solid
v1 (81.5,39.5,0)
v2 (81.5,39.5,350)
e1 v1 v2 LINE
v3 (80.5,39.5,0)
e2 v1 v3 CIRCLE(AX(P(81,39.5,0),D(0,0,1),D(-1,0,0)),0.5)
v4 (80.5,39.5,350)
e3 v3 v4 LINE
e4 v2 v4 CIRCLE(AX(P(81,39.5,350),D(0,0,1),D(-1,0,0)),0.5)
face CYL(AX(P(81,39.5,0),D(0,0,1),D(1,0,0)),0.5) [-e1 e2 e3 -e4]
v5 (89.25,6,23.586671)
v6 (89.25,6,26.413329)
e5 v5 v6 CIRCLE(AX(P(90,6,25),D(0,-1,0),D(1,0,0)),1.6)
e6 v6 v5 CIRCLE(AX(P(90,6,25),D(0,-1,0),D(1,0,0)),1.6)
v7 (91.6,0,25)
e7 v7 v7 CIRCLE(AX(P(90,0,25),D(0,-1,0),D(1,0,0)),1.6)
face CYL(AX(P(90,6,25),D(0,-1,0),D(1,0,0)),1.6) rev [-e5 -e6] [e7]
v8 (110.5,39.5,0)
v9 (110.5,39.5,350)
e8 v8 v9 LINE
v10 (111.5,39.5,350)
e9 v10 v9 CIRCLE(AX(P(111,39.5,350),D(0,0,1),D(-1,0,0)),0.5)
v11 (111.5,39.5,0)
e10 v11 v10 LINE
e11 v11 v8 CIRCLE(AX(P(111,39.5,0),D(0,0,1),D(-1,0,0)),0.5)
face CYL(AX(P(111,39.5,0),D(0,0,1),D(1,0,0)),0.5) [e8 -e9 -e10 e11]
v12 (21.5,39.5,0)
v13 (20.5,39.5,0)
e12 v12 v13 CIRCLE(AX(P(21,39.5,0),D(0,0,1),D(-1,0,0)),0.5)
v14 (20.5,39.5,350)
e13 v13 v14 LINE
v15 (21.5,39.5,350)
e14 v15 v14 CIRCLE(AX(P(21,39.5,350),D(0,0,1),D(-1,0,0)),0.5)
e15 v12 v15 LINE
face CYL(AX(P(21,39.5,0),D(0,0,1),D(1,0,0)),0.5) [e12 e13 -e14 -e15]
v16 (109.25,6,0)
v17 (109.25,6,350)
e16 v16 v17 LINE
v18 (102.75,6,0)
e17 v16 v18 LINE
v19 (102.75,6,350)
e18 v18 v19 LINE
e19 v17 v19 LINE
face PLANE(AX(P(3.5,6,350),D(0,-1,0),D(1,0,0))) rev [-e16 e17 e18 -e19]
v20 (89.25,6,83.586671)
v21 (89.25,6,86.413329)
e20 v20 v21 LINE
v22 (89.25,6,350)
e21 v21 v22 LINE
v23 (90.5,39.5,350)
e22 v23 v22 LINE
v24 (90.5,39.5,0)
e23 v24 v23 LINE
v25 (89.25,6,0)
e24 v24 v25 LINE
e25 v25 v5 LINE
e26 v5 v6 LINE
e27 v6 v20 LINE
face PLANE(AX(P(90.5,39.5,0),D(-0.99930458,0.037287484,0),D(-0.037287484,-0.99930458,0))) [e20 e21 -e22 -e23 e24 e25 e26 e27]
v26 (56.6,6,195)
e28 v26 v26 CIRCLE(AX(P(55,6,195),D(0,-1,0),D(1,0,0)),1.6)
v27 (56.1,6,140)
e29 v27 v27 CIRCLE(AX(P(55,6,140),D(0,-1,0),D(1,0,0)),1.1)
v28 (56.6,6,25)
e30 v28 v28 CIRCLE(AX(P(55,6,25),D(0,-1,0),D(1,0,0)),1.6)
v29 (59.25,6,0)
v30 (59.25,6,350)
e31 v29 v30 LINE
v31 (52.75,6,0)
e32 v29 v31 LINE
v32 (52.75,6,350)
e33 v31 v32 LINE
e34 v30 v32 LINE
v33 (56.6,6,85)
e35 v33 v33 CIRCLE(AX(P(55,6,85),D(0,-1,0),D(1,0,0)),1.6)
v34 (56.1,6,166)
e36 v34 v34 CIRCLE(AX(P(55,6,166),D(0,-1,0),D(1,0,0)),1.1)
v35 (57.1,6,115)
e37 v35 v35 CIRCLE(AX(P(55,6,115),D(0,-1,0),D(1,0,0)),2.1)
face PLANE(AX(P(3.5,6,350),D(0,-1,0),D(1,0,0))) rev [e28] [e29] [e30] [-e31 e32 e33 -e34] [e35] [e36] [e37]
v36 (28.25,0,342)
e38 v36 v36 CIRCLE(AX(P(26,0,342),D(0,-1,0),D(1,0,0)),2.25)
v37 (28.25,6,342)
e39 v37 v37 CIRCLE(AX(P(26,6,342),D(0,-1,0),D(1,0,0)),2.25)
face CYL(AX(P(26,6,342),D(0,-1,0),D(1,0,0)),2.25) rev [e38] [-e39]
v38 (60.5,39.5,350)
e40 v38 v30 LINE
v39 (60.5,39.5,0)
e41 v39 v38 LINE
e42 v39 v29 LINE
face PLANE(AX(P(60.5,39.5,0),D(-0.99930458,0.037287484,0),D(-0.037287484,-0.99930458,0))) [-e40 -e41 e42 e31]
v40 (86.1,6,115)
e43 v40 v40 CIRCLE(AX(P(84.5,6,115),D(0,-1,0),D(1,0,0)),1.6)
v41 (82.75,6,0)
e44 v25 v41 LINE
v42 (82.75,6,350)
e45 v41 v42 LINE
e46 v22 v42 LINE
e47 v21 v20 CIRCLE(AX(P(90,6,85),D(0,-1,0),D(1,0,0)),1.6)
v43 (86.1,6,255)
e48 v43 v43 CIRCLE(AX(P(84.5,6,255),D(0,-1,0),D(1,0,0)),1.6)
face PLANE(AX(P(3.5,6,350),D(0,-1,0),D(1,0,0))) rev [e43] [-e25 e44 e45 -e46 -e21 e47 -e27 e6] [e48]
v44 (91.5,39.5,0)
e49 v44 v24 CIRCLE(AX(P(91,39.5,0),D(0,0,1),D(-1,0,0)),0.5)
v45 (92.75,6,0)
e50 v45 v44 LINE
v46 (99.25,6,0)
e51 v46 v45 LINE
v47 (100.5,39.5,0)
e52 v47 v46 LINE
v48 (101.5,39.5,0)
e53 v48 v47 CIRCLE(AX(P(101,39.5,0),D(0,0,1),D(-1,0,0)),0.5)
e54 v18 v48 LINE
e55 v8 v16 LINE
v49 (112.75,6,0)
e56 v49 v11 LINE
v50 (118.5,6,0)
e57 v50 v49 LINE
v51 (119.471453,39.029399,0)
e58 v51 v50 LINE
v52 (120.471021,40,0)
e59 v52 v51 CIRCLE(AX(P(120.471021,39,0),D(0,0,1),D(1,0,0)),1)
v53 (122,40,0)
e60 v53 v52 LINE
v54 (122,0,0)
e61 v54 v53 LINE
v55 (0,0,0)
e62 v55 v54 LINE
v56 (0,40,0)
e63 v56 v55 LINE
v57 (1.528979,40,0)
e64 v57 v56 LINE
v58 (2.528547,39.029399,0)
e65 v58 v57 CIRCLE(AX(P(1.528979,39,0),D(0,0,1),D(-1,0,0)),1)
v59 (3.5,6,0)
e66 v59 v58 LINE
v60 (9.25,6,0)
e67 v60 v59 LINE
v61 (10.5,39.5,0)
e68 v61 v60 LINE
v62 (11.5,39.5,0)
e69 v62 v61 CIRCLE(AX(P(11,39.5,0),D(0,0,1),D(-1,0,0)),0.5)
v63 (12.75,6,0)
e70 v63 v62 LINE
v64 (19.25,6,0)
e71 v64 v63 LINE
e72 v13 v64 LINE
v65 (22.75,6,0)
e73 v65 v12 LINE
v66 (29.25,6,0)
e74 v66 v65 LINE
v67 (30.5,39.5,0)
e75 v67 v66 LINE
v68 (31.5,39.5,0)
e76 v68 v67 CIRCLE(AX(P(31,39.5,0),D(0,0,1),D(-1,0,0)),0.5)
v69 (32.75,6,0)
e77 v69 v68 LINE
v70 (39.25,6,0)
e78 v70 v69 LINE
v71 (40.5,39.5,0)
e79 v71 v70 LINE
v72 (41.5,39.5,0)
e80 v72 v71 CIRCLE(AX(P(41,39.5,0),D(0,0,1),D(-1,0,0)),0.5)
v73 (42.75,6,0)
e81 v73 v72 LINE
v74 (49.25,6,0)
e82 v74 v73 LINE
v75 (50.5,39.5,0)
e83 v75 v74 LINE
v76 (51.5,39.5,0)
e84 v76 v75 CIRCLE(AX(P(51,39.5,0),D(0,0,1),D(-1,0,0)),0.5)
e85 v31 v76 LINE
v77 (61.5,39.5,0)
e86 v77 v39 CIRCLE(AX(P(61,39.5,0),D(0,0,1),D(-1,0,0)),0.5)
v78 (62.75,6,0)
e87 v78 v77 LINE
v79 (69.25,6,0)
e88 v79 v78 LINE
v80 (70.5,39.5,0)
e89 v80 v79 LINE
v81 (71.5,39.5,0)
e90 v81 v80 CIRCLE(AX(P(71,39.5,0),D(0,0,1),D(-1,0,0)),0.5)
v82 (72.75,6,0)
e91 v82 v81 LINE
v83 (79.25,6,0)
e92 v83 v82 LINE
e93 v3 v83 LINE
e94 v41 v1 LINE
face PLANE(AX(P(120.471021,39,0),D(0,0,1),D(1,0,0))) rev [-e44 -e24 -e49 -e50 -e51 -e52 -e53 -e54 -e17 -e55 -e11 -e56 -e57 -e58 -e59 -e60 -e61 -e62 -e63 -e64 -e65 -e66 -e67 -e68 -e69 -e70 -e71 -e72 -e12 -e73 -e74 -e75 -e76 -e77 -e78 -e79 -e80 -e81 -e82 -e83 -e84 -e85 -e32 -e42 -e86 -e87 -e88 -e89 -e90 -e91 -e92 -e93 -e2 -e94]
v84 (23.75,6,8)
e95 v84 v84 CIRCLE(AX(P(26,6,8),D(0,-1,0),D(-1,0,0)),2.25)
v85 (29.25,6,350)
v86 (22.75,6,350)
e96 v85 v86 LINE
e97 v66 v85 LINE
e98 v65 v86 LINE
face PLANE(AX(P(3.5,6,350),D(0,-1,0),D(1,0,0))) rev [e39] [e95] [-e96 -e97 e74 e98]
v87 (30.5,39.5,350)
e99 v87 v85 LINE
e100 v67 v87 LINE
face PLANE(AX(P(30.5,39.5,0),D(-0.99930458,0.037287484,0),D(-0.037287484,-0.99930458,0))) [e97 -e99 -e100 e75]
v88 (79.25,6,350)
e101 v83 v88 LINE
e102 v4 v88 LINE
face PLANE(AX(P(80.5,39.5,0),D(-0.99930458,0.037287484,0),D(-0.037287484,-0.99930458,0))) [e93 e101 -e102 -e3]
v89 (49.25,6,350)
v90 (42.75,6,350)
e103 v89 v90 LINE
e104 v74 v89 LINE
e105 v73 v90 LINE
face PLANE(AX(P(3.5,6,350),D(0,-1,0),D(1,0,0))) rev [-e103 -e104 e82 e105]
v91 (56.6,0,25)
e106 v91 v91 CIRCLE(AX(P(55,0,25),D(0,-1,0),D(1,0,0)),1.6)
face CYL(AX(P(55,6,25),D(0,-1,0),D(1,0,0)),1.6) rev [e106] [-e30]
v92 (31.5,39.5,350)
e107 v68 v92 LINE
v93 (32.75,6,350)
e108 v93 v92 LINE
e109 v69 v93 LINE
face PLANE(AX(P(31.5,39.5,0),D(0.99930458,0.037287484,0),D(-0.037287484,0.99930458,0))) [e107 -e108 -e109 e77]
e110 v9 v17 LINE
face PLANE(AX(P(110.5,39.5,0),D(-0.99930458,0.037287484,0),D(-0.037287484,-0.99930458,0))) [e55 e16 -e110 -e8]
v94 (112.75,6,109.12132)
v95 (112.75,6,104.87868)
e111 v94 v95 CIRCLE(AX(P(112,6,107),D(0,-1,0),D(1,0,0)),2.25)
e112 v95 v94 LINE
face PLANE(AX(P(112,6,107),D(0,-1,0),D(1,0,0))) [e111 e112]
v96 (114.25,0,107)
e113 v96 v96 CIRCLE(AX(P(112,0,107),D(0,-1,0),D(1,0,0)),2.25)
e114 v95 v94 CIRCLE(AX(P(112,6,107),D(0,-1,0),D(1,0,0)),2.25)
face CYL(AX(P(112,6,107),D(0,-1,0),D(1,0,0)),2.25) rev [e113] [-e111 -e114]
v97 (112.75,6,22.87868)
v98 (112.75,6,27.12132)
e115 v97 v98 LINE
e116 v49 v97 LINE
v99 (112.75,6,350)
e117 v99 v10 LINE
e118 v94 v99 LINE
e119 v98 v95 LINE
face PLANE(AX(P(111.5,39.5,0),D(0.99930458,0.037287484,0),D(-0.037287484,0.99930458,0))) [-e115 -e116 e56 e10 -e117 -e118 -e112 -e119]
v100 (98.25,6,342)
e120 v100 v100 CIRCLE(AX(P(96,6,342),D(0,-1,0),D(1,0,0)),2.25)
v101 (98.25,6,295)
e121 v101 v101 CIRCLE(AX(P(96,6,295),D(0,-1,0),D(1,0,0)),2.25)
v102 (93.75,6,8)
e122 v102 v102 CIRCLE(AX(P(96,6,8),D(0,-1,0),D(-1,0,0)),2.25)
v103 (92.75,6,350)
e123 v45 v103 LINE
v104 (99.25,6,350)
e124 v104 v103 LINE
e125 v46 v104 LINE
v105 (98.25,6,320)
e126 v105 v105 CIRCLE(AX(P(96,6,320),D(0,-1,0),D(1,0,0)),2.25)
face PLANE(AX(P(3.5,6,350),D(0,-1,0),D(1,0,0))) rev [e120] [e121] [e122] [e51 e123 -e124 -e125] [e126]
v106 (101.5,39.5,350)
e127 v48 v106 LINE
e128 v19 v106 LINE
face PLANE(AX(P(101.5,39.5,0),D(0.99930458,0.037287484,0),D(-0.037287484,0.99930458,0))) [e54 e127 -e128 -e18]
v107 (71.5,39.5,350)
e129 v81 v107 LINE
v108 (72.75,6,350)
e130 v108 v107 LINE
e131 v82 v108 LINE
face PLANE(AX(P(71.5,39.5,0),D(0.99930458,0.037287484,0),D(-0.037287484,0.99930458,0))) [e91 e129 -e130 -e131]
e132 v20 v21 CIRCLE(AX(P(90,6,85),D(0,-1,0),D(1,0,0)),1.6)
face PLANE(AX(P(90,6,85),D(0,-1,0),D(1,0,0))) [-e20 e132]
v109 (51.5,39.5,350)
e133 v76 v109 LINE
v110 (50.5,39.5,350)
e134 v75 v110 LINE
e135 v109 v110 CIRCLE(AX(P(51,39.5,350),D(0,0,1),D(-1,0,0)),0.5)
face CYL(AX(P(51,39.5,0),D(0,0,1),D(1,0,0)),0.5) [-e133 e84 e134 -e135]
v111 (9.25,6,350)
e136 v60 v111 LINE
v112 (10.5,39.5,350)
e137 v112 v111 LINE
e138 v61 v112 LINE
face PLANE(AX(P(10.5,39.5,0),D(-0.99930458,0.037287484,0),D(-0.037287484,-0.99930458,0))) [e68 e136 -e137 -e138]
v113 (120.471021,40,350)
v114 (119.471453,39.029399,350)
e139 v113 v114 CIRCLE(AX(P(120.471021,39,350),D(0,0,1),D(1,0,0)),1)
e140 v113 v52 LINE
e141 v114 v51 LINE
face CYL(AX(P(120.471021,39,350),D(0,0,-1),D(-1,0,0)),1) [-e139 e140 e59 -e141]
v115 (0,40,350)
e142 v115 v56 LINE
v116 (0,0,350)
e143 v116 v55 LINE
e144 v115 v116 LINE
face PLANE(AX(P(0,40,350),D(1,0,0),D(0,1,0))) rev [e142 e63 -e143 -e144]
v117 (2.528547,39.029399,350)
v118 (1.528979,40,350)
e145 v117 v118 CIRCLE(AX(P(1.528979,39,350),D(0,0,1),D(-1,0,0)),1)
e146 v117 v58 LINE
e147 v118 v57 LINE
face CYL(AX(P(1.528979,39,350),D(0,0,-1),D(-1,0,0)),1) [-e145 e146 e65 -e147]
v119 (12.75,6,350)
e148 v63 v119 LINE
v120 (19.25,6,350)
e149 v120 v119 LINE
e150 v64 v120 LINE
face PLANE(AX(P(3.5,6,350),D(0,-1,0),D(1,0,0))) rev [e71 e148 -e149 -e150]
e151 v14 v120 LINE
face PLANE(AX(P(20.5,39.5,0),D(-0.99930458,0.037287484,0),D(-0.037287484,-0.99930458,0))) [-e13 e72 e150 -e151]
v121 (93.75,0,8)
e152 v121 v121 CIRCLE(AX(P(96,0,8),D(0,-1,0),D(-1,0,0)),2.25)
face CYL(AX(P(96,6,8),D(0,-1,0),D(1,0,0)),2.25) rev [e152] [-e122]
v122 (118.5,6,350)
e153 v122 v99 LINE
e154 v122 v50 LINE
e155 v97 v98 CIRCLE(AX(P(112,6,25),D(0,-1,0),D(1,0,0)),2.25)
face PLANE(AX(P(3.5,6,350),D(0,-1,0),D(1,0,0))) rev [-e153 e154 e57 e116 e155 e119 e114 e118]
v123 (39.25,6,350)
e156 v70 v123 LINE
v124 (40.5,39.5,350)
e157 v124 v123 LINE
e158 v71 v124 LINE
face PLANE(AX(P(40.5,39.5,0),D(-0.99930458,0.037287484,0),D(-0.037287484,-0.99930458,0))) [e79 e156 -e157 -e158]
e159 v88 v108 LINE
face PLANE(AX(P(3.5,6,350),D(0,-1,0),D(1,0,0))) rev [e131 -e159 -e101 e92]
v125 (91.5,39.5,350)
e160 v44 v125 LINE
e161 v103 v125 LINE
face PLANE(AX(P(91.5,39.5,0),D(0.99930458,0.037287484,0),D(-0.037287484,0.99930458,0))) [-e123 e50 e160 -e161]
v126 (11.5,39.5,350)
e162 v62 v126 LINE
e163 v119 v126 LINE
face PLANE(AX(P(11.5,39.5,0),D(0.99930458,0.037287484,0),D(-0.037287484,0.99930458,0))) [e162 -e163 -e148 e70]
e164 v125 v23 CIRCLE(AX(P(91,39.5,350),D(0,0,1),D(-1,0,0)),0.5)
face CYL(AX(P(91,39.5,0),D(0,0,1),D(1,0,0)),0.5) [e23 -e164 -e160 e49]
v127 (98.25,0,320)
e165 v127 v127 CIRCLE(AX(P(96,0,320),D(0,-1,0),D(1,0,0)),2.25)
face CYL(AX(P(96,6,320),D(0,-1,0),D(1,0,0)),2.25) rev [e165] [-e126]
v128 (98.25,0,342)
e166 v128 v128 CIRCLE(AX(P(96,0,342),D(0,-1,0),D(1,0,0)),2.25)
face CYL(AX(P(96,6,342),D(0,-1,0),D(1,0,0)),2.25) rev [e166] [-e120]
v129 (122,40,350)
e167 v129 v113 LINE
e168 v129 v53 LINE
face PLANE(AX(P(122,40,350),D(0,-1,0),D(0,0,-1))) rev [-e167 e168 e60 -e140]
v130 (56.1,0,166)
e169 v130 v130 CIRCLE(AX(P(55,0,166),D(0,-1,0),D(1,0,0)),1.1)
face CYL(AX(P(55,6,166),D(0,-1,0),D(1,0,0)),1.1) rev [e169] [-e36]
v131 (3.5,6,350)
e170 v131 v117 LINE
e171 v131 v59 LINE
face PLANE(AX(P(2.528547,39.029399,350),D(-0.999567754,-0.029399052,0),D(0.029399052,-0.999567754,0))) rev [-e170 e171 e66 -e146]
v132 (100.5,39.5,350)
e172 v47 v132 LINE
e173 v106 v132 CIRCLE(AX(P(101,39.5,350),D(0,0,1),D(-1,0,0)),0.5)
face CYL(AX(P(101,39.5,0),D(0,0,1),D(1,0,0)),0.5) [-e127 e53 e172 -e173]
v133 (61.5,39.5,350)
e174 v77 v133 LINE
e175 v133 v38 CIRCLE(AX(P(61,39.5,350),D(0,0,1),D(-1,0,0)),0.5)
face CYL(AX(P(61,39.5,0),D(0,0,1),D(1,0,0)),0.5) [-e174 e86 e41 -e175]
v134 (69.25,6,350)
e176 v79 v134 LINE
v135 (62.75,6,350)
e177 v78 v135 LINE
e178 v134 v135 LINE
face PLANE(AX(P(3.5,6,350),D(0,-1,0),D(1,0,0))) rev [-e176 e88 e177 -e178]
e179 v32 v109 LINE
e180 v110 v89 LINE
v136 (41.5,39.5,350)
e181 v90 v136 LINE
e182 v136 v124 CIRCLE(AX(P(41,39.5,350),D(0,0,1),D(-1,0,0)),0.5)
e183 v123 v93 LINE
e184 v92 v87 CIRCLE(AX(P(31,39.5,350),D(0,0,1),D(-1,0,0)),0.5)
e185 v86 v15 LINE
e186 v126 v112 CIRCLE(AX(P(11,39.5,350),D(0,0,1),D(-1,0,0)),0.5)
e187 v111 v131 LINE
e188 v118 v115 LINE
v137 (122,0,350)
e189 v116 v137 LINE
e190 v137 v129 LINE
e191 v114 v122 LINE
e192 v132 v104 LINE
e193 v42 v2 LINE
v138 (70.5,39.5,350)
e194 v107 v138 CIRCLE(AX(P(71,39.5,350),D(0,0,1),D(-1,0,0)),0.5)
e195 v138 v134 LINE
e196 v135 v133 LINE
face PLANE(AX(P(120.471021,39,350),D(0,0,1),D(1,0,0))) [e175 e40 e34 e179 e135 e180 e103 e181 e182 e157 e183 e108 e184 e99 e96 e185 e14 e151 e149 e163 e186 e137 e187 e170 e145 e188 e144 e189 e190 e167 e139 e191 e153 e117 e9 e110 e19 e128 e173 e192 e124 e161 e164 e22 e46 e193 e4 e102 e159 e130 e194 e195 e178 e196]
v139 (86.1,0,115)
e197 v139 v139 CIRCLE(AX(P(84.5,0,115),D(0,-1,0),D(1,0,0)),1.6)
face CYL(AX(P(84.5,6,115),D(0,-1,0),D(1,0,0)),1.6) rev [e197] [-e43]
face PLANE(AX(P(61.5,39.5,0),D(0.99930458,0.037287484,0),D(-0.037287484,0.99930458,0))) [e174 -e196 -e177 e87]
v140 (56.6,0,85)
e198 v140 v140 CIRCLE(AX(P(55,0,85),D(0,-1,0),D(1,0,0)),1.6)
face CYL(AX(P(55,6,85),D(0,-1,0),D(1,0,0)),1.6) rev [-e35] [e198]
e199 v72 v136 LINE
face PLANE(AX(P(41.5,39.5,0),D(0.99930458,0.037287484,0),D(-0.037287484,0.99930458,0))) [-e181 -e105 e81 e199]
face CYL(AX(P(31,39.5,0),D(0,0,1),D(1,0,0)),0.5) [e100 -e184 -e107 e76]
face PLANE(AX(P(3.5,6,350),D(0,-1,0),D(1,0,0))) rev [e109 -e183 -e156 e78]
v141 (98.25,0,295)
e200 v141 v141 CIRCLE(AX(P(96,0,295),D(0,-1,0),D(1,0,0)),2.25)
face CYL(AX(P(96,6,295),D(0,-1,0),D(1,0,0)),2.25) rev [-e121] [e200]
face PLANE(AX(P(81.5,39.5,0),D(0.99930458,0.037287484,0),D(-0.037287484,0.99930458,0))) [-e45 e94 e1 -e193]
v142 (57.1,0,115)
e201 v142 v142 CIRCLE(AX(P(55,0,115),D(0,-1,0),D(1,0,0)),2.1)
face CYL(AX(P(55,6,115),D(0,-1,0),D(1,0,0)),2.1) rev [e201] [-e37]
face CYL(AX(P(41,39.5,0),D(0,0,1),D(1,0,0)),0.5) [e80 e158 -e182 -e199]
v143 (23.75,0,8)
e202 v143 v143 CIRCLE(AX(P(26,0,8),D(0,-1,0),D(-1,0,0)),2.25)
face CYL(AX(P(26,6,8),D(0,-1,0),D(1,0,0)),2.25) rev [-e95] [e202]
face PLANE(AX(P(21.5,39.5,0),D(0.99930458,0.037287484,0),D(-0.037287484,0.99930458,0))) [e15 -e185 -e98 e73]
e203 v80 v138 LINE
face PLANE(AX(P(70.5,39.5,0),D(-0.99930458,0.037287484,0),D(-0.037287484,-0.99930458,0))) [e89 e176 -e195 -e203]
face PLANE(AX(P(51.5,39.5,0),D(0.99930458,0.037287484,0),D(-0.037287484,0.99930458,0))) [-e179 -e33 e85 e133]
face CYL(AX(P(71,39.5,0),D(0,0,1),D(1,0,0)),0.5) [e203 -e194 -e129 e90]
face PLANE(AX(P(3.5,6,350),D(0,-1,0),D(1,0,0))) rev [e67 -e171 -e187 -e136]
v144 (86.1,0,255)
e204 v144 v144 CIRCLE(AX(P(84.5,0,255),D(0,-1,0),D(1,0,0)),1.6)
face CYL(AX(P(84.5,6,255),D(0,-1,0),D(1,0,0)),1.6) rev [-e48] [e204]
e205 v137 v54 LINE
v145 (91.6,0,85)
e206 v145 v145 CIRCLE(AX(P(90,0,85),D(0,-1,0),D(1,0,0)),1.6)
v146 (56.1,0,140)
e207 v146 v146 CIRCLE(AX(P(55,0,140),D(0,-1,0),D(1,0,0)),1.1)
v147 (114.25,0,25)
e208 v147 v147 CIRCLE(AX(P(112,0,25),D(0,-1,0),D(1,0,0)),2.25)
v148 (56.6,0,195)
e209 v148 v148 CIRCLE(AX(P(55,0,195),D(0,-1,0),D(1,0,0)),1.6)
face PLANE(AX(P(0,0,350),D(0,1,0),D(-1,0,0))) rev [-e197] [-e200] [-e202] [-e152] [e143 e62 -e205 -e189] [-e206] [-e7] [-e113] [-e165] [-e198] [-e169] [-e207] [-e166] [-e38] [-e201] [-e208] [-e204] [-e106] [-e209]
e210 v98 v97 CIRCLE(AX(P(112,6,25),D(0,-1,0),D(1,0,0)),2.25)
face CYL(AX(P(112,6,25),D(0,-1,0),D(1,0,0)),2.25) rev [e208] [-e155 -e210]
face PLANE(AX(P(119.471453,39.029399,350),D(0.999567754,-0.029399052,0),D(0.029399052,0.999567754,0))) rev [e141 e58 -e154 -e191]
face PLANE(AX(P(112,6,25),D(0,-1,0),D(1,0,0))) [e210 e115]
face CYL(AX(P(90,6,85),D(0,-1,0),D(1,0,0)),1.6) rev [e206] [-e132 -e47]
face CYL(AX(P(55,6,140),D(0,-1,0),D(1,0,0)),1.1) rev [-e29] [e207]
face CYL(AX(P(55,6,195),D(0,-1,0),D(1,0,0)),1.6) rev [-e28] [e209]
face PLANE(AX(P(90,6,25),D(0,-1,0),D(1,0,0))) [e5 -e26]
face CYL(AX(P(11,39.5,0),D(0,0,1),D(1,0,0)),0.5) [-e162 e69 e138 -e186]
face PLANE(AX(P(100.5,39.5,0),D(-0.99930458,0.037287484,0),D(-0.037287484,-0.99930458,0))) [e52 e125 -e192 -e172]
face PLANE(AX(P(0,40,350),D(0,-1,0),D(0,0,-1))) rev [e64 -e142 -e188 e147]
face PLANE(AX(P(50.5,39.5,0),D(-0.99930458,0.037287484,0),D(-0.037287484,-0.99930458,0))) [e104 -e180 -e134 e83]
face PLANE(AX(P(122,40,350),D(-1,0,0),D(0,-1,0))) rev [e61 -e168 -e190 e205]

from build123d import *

# Parameters (mm, degrees)
EXTRUDE_1_DEPTH       = 350
EXTRUDE_3_DEPTH       = 350
PATTERN_CURVE_1_COUNT = 11
PATTERN_CURVE_1_PITCH = 10
SKETCH_3_R            = 2.25
CUT_EXTRUDE_1_DEPTH   = 6
SKETCH_4_R            = 1.6
SKETCH_4_R_2          = 2.25
SKETCH_4_R_3          = 2.1
SKETCH_4_R_4          = 1.1
CUT_EXTRUDE_2_DEPTH   = 6


with BuildPart() as part:
    # Эскиз1 → Вытянуть1 (new body)
    with BuildSketch(Plane.XY):
        with BuildLine():
            Line((0, 40), (1.528979332, 40))
            ThreePointArc((1.528979332, 40), (2.225614441, 39.717425624), (2.528547087, 39.029399052))
            Line((2.528547087, 39.029399052), (3.5, 6))
            Line((3.5, 6), (118.5, 6))
            Line((118.5, 6), (119.471452913, 39.029399052))
            ThreePointArc((119.471452913, 39.029399052), (119.774385559, 39.717425624), (120.471020668, 40))
            Line((120.471020668, 40), (122, 40))
            Line((122, 40), (122, 0))
            Line((122, 0), (0, 0))
            Line((0, 0), (0, 40))
        make_face()
    extrude(amount=EXTRUDE_1_DEPTH)

    # Эскиз2 → Вытянуть3 (add)
    with BuildSketch(Plane.XY.offset(350)):
        with BuildLine():
            Line((10.5, 39.5), (9.25, 6))
            Line((9.25, 6), (12.75, 6))
            Line((12.75, 6), (11.5, 39.5))
            ThreePointArc((11.5, 39.5), (11, 40), (10.5, 39.5))
        make_face()
    extrude_3 = extrude(amount=-EXTRUDE_3_DEPTH)

    # Кривая1: Вытянуть3 ×11
    with Locations(*[(i * PATTERN_CURVE_1_PITCH, 0, 0) for i in range(1, PATTERN_CURVE_1_COUNT)]):
        add(extrude_3)

    # Эскиз3 → Вырез-Вытянуть1 (cut)
    with BuildSketch(Plane.XZ):
        with Locations((26, 342)):
            Circle(SKETCH_3_R)
        with Locations((96, 342)):
            Circle(SKETCH_3_R)
        with Locations((96, 8)):
            Circle(SKETCH_3_R)
        with Locations((26, 8)):
            Circle(SKETCH_3_R)
    extrude(amount=-CUT_EXTRUDE_1_DEPTH, mode=Mode.SUBTRACT)

    # Эскиз4 → Вырез-Вытянуть2 (cut)
    with BuildSketch(Plane.XZ):
        with Locations((55, 25)):
            Circle(SKETCH_4_R)
        with Locations((90, 25)):
            Circle(SKETCH_4_R)
        with Locations((55, 85)):
            Circle(SKETCH_4_R)
        with Locations((90, 85)):
            Circle(SKETCH_4_R)
        with Locations((112, 25)):
            Circle(SKETCH_4_R_2)
        with Locations((55, 115)):
            Circle(SKETCH_4_R_3)
        with Locations((84.5, 115)):
            Circle(SKETCH_4_R)
        with Locations((112, 107)):
            Circle(SKETCH_4_R_2)
        with Locations((96, 320)):
            Circle(SKETCH_4_R_2)
        with Locations((96, 295)):
            Circle(SKETCH_4_R_2)
        with Locations((55, 140)):
            Circle(SKETCH_4_R_4)
        with Locations((55, 166)):
            Circle(SKETCH_4_R_4)
        with Locations((55, 195)):
            Circle(SKETCH_4_R)
        with Locations((84.5, 255)):
            Circle(SKETCH_4_R)
    extrude(amount=-CUT_EXTRUDE_2_DEPTH, mode=Mode.SUBTRACT)


solid = part.part
